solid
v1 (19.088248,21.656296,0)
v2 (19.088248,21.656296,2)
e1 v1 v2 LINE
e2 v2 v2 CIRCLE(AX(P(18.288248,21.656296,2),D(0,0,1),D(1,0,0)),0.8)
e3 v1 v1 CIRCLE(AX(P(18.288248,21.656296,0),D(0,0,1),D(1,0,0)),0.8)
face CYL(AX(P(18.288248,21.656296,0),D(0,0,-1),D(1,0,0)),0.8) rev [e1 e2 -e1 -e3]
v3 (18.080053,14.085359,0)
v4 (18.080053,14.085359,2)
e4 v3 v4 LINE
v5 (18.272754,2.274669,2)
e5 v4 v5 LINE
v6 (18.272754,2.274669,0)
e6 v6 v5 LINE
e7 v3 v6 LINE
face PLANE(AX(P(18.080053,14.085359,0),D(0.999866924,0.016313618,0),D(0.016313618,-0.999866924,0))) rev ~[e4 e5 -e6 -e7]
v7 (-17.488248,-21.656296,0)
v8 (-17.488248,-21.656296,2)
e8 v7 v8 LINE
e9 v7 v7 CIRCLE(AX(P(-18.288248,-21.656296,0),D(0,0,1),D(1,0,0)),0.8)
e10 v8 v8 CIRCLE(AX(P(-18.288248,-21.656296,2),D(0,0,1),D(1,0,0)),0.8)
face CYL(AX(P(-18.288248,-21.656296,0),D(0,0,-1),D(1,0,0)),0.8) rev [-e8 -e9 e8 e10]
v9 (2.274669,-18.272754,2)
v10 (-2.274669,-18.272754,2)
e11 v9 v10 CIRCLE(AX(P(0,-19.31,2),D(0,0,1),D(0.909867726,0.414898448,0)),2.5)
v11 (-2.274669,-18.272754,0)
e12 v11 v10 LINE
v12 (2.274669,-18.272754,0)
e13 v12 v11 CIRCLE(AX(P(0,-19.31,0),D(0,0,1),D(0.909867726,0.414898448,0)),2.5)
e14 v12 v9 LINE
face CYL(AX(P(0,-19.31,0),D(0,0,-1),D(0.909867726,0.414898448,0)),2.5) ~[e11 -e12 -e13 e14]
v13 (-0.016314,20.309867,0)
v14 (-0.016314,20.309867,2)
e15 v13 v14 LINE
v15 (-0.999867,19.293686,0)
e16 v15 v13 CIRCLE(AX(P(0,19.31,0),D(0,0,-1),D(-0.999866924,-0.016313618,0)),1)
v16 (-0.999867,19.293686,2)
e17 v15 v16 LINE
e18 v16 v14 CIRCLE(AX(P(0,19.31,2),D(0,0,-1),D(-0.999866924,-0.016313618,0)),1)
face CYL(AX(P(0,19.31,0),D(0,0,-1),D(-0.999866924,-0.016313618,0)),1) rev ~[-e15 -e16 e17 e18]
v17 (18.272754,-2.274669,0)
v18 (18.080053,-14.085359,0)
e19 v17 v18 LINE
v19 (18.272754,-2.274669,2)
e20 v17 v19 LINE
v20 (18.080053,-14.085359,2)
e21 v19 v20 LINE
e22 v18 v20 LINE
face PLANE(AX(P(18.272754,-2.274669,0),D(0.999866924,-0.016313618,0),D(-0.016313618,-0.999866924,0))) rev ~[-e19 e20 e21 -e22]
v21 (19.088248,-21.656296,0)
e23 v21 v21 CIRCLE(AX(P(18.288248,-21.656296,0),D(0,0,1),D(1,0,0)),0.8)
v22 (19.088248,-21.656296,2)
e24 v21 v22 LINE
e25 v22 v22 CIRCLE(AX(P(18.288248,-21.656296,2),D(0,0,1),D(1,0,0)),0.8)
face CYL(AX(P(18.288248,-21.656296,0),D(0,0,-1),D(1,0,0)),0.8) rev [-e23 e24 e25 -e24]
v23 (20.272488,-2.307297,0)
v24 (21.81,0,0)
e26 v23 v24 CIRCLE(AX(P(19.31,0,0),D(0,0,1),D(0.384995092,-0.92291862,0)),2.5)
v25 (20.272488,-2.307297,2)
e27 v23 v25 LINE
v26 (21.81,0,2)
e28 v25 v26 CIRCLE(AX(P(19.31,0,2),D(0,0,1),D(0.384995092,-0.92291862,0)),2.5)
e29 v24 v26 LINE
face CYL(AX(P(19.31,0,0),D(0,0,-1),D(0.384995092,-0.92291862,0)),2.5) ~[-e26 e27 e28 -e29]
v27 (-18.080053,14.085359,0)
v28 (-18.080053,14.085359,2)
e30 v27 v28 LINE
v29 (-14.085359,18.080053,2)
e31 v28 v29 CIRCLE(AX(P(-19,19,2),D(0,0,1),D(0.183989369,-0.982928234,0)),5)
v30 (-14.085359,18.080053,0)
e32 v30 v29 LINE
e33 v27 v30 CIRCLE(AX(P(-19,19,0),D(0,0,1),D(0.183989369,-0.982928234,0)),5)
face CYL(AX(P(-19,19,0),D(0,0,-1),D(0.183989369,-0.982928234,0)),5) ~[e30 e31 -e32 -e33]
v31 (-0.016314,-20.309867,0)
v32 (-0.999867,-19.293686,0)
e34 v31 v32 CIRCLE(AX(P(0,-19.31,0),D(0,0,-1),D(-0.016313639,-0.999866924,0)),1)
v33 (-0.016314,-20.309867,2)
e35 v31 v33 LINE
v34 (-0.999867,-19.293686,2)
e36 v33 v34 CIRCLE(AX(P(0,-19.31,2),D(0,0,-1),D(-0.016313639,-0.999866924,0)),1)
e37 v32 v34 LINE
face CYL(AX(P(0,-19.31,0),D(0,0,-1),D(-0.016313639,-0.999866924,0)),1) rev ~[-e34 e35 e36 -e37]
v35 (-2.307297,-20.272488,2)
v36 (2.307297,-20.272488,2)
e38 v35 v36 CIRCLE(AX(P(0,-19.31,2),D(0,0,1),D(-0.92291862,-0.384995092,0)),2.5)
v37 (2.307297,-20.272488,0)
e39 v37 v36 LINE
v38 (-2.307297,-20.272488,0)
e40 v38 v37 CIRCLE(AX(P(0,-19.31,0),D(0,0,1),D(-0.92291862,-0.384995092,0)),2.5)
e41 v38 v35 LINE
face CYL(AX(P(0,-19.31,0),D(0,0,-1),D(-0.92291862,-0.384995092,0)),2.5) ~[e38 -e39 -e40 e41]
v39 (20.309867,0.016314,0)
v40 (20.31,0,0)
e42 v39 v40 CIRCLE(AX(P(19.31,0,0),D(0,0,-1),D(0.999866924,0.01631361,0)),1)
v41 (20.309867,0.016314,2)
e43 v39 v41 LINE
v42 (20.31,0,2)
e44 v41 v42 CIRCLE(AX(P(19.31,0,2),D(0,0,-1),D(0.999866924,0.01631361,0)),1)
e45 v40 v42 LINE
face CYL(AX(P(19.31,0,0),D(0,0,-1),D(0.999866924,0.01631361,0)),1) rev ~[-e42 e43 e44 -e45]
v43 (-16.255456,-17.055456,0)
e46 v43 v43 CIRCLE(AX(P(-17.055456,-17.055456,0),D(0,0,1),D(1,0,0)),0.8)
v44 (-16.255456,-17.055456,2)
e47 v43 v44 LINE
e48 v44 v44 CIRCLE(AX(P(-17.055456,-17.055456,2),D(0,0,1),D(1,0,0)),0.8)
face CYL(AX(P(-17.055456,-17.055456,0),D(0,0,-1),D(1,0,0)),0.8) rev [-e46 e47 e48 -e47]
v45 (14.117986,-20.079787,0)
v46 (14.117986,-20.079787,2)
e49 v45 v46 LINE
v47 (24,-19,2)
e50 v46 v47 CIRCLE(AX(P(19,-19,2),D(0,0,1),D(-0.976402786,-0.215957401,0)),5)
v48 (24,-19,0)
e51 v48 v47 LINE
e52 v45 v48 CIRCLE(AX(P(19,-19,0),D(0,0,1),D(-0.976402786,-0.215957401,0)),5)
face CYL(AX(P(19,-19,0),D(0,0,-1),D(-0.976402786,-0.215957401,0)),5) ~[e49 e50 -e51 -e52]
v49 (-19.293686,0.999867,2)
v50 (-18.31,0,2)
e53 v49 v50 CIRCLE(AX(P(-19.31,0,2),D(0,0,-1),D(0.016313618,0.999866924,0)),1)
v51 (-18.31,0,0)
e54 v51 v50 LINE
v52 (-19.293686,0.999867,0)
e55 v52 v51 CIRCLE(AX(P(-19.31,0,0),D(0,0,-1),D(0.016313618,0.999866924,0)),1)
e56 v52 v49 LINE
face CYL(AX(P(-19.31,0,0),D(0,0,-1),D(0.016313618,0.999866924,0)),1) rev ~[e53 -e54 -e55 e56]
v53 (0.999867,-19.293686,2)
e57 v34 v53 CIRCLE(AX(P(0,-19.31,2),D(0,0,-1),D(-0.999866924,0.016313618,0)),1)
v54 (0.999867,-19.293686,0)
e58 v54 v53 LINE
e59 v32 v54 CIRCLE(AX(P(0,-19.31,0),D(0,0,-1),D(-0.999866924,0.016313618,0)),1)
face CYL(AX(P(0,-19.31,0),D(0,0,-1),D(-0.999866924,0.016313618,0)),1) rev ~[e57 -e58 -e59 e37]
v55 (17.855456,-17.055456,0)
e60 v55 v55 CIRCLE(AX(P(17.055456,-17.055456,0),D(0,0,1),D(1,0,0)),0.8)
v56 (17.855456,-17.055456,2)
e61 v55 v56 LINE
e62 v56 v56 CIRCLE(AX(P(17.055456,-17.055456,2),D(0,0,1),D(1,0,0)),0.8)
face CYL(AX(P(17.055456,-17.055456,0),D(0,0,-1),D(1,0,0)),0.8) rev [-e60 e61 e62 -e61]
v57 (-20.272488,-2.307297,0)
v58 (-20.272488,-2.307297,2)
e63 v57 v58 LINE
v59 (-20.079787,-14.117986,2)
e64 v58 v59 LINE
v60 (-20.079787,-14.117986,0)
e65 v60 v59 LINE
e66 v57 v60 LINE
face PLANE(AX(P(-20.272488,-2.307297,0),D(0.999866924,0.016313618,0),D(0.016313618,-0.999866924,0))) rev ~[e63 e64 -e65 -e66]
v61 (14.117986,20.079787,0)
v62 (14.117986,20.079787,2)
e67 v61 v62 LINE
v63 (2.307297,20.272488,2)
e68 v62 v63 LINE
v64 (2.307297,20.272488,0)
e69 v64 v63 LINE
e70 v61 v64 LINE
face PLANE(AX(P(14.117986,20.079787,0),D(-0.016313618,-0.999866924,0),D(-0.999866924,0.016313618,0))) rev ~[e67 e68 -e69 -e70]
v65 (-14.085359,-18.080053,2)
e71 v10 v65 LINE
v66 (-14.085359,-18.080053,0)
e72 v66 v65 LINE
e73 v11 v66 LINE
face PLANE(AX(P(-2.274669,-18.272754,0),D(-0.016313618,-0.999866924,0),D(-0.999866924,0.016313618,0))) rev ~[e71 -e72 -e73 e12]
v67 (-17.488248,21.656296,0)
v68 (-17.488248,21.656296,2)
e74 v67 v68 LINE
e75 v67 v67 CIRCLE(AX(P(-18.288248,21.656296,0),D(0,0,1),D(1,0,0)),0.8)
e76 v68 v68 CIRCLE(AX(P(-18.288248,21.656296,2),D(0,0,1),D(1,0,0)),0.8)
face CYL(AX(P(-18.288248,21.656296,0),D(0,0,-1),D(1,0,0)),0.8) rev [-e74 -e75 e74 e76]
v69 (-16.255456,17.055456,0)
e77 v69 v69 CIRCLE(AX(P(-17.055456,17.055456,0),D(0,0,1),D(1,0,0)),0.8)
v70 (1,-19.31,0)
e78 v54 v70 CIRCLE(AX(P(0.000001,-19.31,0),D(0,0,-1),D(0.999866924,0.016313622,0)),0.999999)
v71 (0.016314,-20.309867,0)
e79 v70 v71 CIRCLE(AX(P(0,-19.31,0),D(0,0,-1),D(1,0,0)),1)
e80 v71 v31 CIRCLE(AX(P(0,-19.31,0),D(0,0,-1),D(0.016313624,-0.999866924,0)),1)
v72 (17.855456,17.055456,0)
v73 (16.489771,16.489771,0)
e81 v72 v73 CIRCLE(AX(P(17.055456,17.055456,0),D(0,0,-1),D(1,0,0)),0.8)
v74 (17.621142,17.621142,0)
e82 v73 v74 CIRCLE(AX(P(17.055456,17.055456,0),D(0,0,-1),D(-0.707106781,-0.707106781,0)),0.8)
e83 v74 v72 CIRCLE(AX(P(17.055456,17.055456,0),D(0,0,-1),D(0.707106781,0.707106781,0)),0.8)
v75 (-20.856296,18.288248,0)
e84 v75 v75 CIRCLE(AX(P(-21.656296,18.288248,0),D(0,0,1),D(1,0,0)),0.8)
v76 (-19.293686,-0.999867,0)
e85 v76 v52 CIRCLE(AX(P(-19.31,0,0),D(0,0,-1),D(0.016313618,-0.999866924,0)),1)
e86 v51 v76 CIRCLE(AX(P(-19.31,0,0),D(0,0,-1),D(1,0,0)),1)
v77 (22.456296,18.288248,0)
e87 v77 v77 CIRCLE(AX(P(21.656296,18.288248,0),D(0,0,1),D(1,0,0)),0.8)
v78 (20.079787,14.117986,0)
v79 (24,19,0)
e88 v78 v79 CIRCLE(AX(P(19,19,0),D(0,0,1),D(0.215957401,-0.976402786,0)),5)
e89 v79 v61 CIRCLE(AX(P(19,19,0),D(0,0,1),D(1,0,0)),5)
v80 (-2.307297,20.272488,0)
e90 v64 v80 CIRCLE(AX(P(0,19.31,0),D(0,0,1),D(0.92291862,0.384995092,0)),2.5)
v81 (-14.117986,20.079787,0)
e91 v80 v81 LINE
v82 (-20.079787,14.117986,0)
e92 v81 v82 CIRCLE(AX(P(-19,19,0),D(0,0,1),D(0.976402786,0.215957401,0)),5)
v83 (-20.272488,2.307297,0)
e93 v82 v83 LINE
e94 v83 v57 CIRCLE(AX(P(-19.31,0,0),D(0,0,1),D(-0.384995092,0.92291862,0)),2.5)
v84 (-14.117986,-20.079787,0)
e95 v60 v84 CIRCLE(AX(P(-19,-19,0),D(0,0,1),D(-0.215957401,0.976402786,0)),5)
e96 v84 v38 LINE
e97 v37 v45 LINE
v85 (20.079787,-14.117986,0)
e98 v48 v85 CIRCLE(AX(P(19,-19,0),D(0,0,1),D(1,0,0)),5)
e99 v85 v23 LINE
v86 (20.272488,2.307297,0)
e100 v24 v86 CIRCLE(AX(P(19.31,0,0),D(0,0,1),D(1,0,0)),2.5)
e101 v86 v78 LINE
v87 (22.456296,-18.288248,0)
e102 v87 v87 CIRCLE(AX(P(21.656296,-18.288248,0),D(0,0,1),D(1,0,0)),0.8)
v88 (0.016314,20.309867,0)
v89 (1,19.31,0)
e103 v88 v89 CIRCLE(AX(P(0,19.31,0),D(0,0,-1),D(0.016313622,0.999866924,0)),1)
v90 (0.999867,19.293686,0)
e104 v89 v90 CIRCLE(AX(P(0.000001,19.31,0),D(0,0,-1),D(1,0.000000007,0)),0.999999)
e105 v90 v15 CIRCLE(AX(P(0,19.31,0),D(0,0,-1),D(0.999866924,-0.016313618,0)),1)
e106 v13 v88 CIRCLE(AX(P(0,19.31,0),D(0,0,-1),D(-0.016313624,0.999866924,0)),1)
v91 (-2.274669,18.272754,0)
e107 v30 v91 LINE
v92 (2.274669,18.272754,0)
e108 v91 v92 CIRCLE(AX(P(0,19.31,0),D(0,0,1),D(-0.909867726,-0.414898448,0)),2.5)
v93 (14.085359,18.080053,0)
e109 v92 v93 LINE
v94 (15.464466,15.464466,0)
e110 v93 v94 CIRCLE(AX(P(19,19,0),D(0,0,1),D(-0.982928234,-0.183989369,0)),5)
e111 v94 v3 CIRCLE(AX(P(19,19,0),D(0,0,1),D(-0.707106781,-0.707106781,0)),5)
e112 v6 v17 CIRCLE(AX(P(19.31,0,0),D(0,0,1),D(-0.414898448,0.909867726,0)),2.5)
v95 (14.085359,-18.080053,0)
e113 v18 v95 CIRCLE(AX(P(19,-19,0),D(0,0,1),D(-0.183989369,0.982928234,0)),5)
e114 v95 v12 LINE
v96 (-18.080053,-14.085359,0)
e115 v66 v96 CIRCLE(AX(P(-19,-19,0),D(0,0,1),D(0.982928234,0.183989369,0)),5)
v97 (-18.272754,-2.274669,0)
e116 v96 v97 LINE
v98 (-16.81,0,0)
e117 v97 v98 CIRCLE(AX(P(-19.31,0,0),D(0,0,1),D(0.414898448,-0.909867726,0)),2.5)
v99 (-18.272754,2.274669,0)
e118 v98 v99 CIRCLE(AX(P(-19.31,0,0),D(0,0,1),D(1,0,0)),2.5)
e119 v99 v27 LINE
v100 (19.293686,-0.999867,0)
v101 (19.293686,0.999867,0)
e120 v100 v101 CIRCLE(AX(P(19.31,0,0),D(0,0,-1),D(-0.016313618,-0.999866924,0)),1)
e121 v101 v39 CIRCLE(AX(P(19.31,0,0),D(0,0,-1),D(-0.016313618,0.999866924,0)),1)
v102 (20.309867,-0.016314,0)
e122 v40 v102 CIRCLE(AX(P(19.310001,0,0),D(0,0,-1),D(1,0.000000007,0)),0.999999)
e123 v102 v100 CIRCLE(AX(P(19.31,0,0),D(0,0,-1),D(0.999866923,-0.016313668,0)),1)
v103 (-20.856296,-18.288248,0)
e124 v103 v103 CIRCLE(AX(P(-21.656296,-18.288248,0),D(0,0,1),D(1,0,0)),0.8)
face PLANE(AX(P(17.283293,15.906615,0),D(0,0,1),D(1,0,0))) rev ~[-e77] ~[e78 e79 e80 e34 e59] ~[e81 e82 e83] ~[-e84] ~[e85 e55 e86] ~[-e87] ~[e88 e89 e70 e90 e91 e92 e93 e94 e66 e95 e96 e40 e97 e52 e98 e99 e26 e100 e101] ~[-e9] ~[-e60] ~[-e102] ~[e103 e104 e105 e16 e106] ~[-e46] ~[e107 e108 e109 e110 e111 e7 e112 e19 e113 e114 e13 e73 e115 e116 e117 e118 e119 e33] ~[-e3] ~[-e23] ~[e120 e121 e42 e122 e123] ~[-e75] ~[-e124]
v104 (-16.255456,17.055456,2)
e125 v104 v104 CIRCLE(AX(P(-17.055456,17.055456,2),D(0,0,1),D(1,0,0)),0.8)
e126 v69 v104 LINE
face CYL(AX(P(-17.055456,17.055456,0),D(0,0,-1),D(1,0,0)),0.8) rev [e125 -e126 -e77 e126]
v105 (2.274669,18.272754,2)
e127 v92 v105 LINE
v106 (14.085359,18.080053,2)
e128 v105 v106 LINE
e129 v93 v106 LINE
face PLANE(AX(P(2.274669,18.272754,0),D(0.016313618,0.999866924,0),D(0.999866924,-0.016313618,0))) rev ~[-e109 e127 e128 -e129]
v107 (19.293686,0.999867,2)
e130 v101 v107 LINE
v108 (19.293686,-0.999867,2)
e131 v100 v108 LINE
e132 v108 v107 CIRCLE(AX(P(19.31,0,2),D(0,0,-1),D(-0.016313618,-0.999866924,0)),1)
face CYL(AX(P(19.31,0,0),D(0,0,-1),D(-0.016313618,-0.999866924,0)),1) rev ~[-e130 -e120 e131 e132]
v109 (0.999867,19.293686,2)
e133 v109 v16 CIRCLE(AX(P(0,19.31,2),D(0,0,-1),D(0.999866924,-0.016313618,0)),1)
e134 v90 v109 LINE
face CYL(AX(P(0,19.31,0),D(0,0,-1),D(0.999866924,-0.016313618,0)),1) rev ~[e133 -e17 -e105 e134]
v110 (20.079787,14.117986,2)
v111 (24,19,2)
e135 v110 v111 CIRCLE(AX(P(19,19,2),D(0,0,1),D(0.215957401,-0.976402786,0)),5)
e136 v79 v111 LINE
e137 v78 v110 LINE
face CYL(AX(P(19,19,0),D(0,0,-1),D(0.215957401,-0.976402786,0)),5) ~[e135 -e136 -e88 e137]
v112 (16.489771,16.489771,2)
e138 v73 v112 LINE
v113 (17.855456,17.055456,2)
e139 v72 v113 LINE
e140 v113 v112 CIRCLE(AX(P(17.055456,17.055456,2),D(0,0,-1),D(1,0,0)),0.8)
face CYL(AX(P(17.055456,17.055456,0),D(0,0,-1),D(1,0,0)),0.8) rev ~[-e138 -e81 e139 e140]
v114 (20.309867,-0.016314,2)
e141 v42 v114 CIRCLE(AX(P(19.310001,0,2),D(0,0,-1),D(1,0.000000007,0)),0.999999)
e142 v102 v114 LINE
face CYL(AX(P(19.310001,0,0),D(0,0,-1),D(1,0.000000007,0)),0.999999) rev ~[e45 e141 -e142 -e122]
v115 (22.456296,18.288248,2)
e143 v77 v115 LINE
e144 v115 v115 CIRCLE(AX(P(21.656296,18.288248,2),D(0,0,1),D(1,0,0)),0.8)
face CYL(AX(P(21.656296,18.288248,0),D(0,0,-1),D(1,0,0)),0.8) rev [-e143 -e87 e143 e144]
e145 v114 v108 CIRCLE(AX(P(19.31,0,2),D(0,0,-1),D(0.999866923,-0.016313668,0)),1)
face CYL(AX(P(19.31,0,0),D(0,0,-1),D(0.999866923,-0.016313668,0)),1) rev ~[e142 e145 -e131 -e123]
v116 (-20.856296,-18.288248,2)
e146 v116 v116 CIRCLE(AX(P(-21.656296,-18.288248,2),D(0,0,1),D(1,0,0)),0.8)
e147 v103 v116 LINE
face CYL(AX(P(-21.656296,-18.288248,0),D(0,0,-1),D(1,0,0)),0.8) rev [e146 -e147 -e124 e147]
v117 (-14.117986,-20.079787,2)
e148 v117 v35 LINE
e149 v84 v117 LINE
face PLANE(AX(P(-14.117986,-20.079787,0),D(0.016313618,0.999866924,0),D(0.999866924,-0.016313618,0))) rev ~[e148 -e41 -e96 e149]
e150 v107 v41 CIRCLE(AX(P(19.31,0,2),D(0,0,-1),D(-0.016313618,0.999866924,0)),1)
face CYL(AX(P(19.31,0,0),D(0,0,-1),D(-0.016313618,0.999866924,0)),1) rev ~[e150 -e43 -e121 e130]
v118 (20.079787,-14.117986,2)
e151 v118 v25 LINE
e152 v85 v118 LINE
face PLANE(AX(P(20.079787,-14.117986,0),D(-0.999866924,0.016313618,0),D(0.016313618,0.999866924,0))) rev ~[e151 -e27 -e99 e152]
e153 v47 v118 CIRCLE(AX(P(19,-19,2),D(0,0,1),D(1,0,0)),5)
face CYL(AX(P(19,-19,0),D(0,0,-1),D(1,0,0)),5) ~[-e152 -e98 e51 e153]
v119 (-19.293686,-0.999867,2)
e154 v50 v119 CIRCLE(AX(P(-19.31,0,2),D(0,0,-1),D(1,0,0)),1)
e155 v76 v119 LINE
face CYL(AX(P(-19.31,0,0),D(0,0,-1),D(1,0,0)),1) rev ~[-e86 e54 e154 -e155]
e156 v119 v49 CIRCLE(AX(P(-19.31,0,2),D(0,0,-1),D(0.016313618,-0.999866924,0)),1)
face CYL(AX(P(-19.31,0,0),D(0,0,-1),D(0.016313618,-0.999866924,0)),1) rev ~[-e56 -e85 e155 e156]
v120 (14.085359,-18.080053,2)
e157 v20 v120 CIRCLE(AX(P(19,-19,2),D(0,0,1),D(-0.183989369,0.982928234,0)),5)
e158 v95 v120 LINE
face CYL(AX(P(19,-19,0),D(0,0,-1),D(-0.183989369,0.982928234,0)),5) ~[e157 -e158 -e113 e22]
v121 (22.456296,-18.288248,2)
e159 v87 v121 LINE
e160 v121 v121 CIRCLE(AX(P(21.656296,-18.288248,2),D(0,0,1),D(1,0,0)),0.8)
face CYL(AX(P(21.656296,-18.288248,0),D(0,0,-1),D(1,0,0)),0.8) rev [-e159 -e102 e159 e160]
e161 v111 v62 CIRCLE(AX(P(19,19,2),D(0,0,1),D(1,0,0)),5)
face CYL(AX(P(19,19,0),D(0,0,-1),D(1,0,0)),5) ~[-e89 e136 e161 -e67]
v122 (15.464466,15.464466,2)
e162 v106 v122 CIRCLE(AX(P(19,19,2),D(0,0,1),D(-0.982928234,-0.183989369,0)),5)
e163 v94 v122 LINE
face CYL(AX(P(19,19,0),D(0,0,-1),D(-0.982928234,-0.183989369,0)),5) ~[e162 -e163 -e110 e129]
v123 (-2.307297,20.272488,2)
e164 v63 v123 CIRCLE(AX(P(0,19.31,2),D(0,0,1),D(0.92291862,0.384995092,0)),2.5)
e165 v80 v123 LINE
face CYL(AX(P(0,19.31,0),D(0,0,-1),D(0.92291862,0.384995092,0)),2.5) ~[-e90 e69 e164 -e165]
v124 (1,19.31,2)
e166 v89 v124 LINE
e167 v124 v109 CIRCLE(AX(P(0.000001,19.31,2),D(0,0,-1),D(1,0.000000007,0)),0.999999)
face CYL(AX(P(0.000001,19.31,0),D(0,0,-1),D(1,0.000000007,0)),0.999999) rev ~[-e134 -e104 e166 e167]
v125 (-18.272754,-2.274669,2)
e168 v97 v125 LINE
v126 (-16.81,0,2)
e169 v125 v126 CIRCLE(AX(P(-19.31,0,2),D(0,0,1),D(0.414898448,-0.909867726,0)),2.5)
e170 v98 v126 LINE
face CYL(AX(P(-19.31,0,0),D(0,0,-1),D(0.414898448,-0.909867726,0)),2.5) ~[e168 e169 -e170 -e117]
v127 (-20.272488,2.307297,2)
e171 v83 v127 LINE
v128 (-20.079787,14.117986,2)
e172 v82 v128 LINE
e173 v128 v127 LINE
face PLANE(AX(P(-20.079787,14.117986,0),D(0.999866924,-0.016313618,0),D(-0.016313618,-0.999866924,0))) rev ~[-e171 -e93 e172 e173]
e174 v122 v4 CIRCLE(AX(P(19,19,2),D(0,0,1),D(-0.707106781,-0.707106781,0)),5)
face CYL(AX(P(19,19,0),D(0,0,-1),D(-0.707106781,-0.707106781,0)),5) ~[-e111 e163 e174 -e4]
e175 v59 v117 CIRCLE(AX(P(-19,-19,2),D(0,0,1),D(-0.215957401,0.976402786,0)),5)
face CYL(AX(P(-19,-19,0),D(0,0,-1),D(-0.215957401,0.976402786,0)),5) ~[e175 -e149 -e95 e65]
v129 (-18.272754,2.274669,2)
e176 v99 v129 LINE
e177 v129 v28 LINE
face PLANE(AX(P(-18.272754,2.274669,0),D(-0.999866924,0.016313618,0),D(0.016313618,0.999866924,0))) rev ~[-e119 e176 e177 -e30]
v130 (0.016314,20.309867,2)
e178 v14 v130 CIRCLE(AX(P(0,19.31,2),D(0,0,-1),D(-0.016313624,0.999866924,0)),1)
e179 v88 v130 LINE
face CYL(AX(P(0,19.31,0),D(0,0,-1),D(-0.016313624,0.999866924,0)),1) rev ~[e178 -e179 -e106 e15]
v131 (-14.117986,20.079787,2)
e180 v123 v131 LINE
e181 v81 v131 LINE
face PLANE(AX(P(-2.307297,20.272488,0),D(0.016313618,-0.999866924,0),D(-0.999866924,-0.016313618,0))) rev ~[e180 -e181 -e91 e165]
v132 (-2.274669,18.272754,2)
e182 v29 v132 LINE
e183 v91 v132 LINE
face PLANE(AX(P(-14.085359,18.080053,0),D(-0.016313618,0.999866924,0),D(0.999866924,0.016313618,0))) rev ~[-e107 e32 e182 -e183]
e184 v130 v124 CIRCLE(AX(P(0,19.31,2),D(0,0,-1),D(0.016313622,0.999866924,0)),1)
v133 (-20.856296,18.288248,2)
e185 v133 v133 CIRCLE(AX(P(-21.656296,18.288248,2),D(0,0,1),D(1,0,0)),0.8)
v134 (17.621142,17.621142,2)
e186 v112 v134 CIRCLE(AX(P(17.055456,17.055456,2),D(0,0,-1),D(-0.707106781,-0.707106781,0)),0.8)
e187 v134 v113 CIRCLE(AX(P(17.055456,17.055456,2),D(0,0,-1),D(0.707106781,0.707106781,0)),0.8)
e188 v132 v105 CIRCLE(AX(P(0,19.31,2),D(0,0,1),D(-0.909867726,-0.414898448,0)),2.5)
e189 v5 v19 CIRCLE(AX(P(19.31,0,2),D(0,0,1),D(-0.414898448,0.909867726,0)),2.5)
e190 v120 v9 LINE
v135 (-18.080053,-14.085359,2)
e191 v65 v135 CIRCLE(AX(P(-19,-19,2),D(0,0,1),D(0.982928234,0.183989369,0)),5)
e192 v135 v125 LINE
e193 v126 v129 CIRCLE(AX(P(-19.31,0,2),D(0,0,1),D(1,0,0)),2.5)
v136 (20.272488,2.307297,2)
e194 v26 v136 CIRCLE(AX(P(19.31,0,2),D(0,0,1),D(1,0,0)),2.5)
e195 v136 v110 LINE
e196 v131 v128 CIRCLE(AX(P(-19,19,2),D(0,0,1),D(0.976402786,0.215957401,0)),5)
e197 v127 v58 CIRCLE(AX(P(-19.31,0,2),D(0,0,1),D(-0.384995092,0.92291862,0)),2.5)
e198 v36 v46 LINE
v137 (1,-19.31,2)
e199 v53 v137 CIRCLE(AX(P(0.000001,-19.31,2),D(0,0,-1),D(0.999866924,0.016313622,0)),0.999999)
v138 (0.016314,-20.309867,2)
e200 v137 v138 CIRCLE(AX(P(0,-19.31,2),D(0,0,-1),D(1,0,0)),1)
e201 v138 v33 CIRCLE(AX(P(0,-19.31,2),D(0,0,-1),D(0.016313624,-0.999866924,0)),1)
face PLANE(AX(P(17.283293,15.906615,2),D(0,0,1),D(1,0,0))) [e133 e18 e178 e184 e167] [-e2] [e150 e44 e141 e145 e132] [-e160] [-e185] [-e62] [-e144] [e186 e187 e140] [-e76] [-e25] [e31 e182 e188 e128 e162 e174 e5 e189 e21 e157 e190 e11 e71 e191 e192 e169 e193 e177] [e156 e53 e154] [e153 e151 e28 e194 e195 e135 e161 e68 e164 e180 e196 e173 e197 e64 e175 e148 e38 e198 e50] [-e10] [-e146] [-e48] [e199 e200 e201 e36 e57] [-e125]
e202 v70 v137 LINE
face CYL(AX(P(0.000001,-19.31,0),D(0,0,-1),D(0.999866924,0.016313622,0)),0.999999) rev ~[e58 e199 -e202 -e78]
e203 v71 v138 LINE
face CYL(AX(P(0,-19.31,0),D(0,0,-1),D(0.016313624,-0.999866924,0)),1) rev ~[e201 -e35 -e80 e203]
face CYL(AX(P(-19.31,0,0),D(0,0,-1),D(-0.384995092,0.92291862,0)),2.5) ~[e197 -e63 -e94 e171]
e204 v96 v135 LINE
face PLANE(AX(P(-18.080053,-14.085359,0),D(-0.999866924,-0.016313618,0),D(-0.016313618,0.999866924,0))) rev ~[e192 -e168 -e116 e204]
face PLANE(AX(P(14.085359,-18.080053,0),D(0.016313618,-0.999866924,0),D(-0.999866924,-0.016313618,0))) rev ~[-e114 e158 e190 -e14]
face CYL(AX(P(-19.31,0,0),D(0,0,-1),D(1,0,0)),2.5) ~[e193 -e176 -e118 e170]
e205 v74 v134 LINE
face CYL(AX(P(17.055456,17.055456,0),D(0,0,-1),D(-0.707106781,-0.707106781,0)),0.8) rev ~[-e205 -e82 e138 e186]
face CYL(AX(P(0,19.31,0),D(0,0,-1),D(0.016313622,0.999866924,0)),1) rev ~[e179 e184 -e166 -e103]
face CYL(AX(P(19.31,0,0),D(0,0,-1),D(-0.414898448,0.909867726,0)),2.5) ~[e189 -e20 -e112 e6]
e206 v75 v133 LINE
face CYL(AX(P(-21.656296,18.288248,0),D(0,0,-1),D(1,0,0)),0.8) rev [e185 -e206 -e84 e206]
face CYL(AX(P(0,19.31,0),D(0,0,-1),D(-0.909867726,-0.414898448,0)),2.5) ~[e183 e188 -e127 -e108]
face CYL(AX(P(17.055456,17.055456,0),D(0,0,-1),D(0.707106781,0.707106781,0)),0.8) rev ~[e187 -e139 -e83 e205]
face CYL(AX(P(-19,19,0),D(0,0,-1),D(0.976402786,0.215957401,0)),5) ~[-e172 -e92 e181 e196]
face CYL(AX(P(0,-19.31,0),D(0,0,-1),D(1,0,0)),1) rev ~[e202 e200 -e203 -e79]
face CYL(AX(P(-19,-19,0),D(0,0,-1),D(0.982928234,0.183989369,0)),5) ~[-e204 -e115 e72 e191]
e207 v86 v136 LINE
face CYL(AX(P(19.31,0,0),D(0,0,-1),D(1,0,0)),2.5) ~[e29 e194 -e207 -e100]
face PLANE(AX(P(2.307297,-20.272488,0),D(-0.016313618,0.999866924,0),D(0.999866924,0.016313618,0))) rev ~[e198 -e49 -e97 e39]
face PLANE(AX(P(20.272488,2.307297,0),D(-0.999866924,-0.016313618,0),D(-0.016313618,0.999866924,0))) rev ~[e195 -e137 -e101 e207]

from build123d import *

# Parameters (mm, degrees)
F0_R     = 0.8
F1_DEPTH = 2


with BuildPart() as f1:
    # F0 (on Top) → F1 (new body)
    with BuildSketch(Plane.XY):
        with BuildLine():
            ThreePointArc((17.6211417767, 17.6211417767), (17.7945599777, 17.3616030976), (17.8554563517, 17.0554563517))
            ThreePointArc((17.8554563517, 17.0554563517), (17.3616030976, 16.3163527257), (16.4897709268, 16.4897709268))
            Line((16.4897709268, 16.4897709268), (15.4644660941, 15.4644660941))
            ThreePointArc((15.4644660941, 15.4644660941), (16.6679812638, 14.5771402222), (18.080053157, 14.0853588324))
            Line((18.080053157, 14.0853588324), (18.0159229011, 18.0159229011))
            Line((18.0159229011, 18.0159229011), (17.6211417767, 17.6211417767))
        make_face()
        with BuildLine():
            ThreePointArc((16.4897709268, 16.4897709268), (16.4897709268, 17.6211417767), (17.6211417767, 17.6211417767))
            Line((17.6211417767, 17.6211417767), (18.0159229011, 18.0159229011))
            Line((18.0159229011, 18.0159229011), (14.0853588324, 18.080053157))
            ThreePointArc((14.0853588324, 18.080053157), (14.5771402222, 16.6679812638), (15.4644660941, 15.4644660941))
            Line((15.4644660941, 15.4644660941), (16.4897709268, 16.4897709268))
        make_face()
        with BuildLine():
            Line((14.0853588324, 18.080053157), (18.0159229011, 18.0159229011))
            Line((18.0159229011, 18.0159229011), (19, 19))
            Line((19, 19), (14.0006653796, 19.0815680912))
            ThreePointArc((14.0006653796, 19.0815680912), (14.017782921, 18.5786771094), (14.0853588324, 18.080053157))
        make_face()
        with BuildLine():
            Line((19, 19), (18.0159229011, 18.0159229011))
            Line((18.0159229011, 18.0159229011), (18.080053157, 14.0853588324))
            ThreePointArc((18.080053157, 14.0853588324), (18.5786771094, 14.017782921), (19.0815680912, 14.0006653796))
            Line((19.0815680912, 14.0006653796), (19, 19))
        make_face()
        with BuildLine():
            Line((14.0006653796, 19.0815680912), (19, 19))
            Line((19, 19), (19.0815680912, 14.0006653796))
            ThreePointArc((19.0815680912, 14.0006653796), (19.5836329763, 14.0341795694), (20.0797870051, 14.1179860689))
            Line((20.0797870051, 14.1179860689), (19.9840770989, 19.9840770989))
            Line((19.9840770989, 19.9840770989), (14.1179860689, 20.0797870051))
            ThreePointArc((14.1179860689, 20.0797870051), (14.0341795694, 19.5836329763), (14.0006653796, 19.0815680912))
        make_face()
        with BuildLine():
            Line((2.274669314, 18.2727538807), (14.0853588324, 18.080053157))
            ThreePointArc((14.0853588324, 18.080053157), (14.017782921, 18.5786771094), (14.0006653796, 19.0815680912))
            Line((14.0006653796, 19.0815680912), (2.4996673102, 19.2692159544))
            ThreePointArc((2.4996673102, 19.2692159544), (2.4386075363, 18.7593701028), (2.274669314, 18.2727538807))
        make_face()
        with BuildLine():
            ThreePointArc((19.0815680912, 14.0006653796), (18.5786771094, 14.017782921), (18.080053157, 14.0853588324))
            Line((18.080053157, 14.0853588324), (18.2727538807, 2.274669314))
            ThreePointArc((18.2727538807, 2.274669314), (18.7593701028, 2.4386075363), (19.2692159544, 2.4996673102))
            Line((19.2692159544, 2.4996673102), (19.0815680912, 14.0006653796))
        make_face()
        with BuildLine():
            ThreePointArc((20.0797870051, 14.1179860689), (19.5836329763, 14.0341795694), (19.0815680912, 14.0006653796))
            Line((19.0815680912, 14.0006653796), (19.2692159544, 2.4996673102))
            ThreePointArc((19.2692159544, 2.4996673102), (19.7807823778, 2.455272684), (20.2724877289, 2.3072965505))
            Line((20.2724877289, 2.3072965505), (20.0797870051, 14.1179860689))
        make_face()
        with BuildLine():
            Line((2.4996673102, 19.2692159544), (14.0006653796, 19.0815680912))
            ThreePointArc((14.0006653796, 19.0815680912), (14.0341795694, 19.5836329763), (14.1179860689, 20.0797870051))
            Line((14.1179860689, 20.0797870051), (2.3072965505, 20.2724877289))
            ThreePointArc((2.3072965505, 20.2724877289), (2.4513507885, 19.800794572), (2.5, 19.31))
            ThreePointArc((2.5, 19.31), (2.4999168262, 19.2896072988), (2.4996673102, 19.2692159544))
        make_face()
        with BuildLine():
            Line((0, 18.3098669064), (2.274669314, 18.2727538807))
            ThreePointArc((2.274669314, 18.2727538807), (2.4386075363, 18.7593701028), (2.4996673102, 19.2692159544))
            Line((2.4996673102, 19.2692159544), (0.9998669241, 19.2936863818))
            ThreePointArc((0.9998669241, 19.2936863818), (0, 18.31), (-0.9998669241, 19.2936863818))
            Line((-0.9998669241, 19.2936863818), (-2.4996673102, 19.2692159544))
            ThreePointArc((-2.4996673102, 19.2692159544), (-2.4386075363, 18.7593701028), (-2.274669314, 18.2727538807))
            Line((-2.274669314, 18.2727538807), (0, 18.3098669064))
        make_face()
        with BuildLine():
            ThreePointArc((-2.274669314, 18.2727538807), (0, 16.81), (2.274669314, 18.2727538807))
            Line((2.274669314, 18.2727538807), (0, 18.3098669064))
            Line((0, 18.3098669064), (-2.274669314, 18.2727538807))
        make_face()
        with BuildLine():
            Line((18.3098669064, 0), (18.2727538807, 2.274669314))
            ThreePointArc((18.2727538807, 2.274669314), (16.81, 0), (18.2727538807, -2.274669314))
            Line((18.2727538807, -2.274669314), (18.3098669064, 0))
        make_face()
        with BuildLine():
            ThreePointArc((19.2692159544, 2.4996673102), (18.7593701028, 2.4386075363), (18.2727538807, 2.274669314))
            Line((18.2727538807, 2.274669314), (18.3098669064, 0))
            Line((18.3098669064, 0), (18.2727538807, -2.274669314))
            ThreePointArc((18.2727538807, -2.274669314), (18.7593701028, -2.4386075363), (19.2692159544, -2.4996673102))
            Line((19.2692159544, -2.4996673102), (19.2936863818, -0.9998669241))
            ThreePointArc((19.2936863818, -0.9998669241), (18.31, 0), (19.2936863818, 0.9998669241))
            Line((19.2936863818, 0.9998669241), (19.2692159544, 2.4996673102))
        make_face()
        with BuildLine():
            Line((19.9840770989, 19.9840770989), (20.0797870051, 14.1179860689))
            ThreePointArc((20.0797870051, 14.1179860689), (22.8986494473, 15.8694197843), (24, 19))
            ThreePointArc((24, 19), (19.5431069621, 23.9704159612), (14.1179860689, 20.0797870051))
            Line((14.1179860689, 20.0797870051), (19.9840770989, 19.9840770989))
        make_face()
        with Locations((21.6562960223, 18.288247626)):
            Circle(F0_R, mode=Mode.SUBTRACT)
        with Locations((18.288247626, 21.6562960223)):
            Circle(F0_R, mode=Mode.SUBTRACT)
        with BuildLine():
            ThreePointArc((20.2724877289, 2.3072965505), (19.7807823778, 2.455272684), (19.2692159544, 2.4996673102))
            Line((19.2692159544, 2.4996673102), (19.2936863818, 0.9998669241))
            ThreePointArc((19.2936863818, 0.9998669241), (20.0054772146, 0.7185481501), (20.3098669242, 0.0163136116))
            Line((20.3098669242, 0.0163136116), (20.2724877289, 2.3072965505))
        make_face()
        with BuildLine():
            Line((0.9998669241, 19.2936863818), (2.4996673102, 19.2692159544))
            ThreePointArc((2.4996673102, 19.2692159544), (2.4999168262, 19.2896072988), (2.5, 19.31))
            ThreePointArc((2.5, 19.31), (2.4513507885, 19.800794572), (2.3072965505, 20.2724877289))
            Line((2.3072965505, 20.2724877289), (0.0163136221, 20.309866924))
            ThreePointArc((0.0163136221, 20.309866924), (0.7128511844, 20.0113153278), (1, 19.31))
            ThreePointArc((1, 19.31), (0.9999667305, 19.3018429195), (0.9998669241, 19.2936863818))
        make_face()
        with BuildLine():
            Line((-14.0853588324, 18.080053157), (-2.274669314, 18.2727538807))
            ThreePointArc((-2.274669314, 18.2727538807), (-2.4386075363, 18.7593701028), (-2.4996673102, 19.2692159544))
            Line((-2.4996673102, 19.2692159544), (-14.0006653796, 19.0815680912))
            ThreePointArc((-14.0006653796, 19.0815680912), (-14.0001663477, 19.0407854025), (-14, 19))
            ThreePointArc((-14, 19), (-14.0213854418, 18.5380507809), (-14.0853588324, 18.080053157))
        make_face()
        with BuildLine():
            ThreePointArc((19.2692159544, -2.4996673102), (18.7593701028, -2.4386075363), (18.2727538807, -2.274669314))
            Line((18.2727538807, -2.274669314), (18.080053157, -14.0853588324))
            ThreePointArc((18.080053157, -14.0853588324), (18.5786771094, -14.017782921), (19.0815680912, -14.0006653796))
            Line((19.0815680912, -14.0006653796), (19.2692159544, -2.4996673102))
        make_face()
        with BuildLine():
            ThreePointArc((21.81, 0), (21.3904109356, 1.3863225955), (20.2724877289, 2.3072965505))
            Line((20.2724877289, 2.3072965505), (20.3098669242, 0.0163136116))
            Line((20.3098669242, 0.0163136116), (20.3101330936, 0))
            Line((20.3101330936, 0), (20.3098669233, -0.0163136677))
            Line((20.3098669233, -0.0163136677), (20.2724877289, -2.3072965505))
            ThreePointArc((20.2724877289, -2.3072965505), (21.3904109356, -1.3863225955), (21.81, 0))
        make_face()
        with BuildLine():
            Line((0.0163136221, 20.309866924), (2.3072965505, 20.2724877289))
            ThreePointArc((2.3072965505, 20.2724877289), (0, 21.81), (-2.3072965505, 20.2724877289))
            Line((-2.3072965505, 20.2724877289), (-0.0163136221, 20.309866924))
            Line((-0.0163136221, 20.309866924), (0, 20.3101330936))
            Line((0, 20.3101330936), (0.0163136221, 20.309866924))
        make_face()
        with BuildLine():
            Line((-14.0006653796, 19.0815680912), (-2.4996673102, 19.2692159544))
            ThreePointArc((-2.4996673102, 19.2692159544), (-2.455272684, 19.7807823778), (-2.3072965505, 20.2724877289))
            Line((-2.3072965505, 20.2724877289), (-14.1179860689, 20.0797870051))
            ThreePointArc((-14.1179860689, 20.0797870051), (-14.0341795694, 19.5836329763), (-14.0006653796, 19.0815680912))
        make_face()
        with BuildLine():
            ThreePointArc((-2.3072965505, 20.2724877289), (-2.455272684, 19.7807823778), (-2.4996673102, 19.2692159544))
            Line((-2.4996673102, 19.2692159544), (-0.9998669241, 19.2936863818))
            ThreePointArc((-0.9998669241, 19.2936863818), (-0.7185481537, 20.0054772108), (-0.0163136221, 20.309866924))
            Line((-0.0163136221, 20.309866924), (-2.3072965505, 20.2724877289))
        make_face()
        with BuildLine():
            Line((-18.0159229011, 18.0159229011), (-14.0853588324, 18.080053157))
            ThreePointArc((-14.0853588324, 18.080053157), (-14.0213854418, 18.5380507809), (-14, 19))
            ThreePointArc((-14, 19), (-14.0001663477, 19.0407854025), (-14.0006653796, 19.0815680912))
            Line((-14.0006653796, 19.0815680912), (-19, 19))
            Line((-19, 19), (-19.0815680912, 14.0006653796))
            ThreePointArc((-19.0815680912, 14.0006653796), (-18.5786771094, 14.017782921), (-18.080053157, 14.0853588324))
            Line((-18.080053157, 14.0853588324), (-18.0159229011, 18.0159229011))
        make_face()
        with BuildLine():
            ThreePointArc((-18.080053157, 14.0853588324), (-15.4644660941, 15.4644660941), (-14.0853588324, 18.080053157))
            Line((-14.0853588324, 18.080053157), (-18.0159229011, 18.0159229011))
            Line((-18.0159229011, 18.0159229011), (-18.080053157, 14.0853588324))
        make_face()
        with Locations((-17.0554563517, 17.0554563517)):
            Circle(F0_R, mode=Mode.SUBTRACT)
        with BuildLine():
            Line((19.2936863818, -0.9998669241), (19.2692159544, -2.4996673102))
            ThreePointArc((19.2692159544, -2.4996673102), (19.7807823778, -2.455272684), (20.2724877289, -2.3072965505))
            Line((20.2724877289, -2.3072965505), (20.3098669233, -0.0163136677))
            ThreePointArc((20.3098669233, -0.0163136677), (20.0054771945, -0.7185481696), (19.2936863818, -0.9998669241))
        make_face()
        with BuildLine():
            ThreePointArc((20.2724877289, -2.3072965505), (19.7807823778, -2.455272684), (19.2692159544, -2.4996673102))
            Line((19.2692159544, -2.4996673102), (19.0815680912, -14.0006653796))
            ThreePointArc((19.0815680912, -14.0006653796), (19.5836329763, -14.0341795694), (20.0797870051, -14.1179860689))
            Line((20.0797870051, -14.1179860689), (20.2724877289, -2.3072965505))
        make_face()
        with BuildLine():
            Line((18.0159229011, -18.0159229011), (18.080053157, -14.0853588324))
            ThreePointArc((18.080053157, -14.0853588324), (15.4644660941, -15.4644660941), (14.0853588324, -18.080053157))
            Line((14.0853588324, -18.080053157), (18.0159229011, -18.0159229011))
        make_face()
        with Locations((17.0554563517, -17.0554563517)):
            Circle(F0_R, mode=Mode.SUBTRACT)
        with BuildLine():
            ThreePointArc((19.0815680912, -14.0006653796), (18.5786771094, -14.017782921), (18.080053157, -14.0853588324))
            Line((18.080053157, -14.0853588324), (18.0159229011, -18.0159229011))
            Line((18.0159229011, -18.0159229011), (14.0853588324, -18.080053157))
            ThreePointArc((14.0853588324, -18.080053157), (14.017782921, -18.5786771094), (14.0006653796, -19.0815680912))
            Line((14.0006653796, -19.0815680912), (19, -19))
            Line((19, -19), (19.0815680912, -14.0006653796))
        make_face()
        with BuildLine():
            Line((20.3101330936, 0), (20.3098669242, 0.0163136116))
            ThreePointArc((20.3098669242, 0.0163136116), (20.3099667305, 0.0081570772), (20.31, 0))
            ThreePointArc((20.31, 0), (20.3099667303, -0.0081571052), (20.3098669233, -0.0163136677))
            Line((20.3098669233, -0.0163136677), (20.3101330936, 0))
        make_face()
        with BuildLine():
            ThreePointArc((-0.0163136221, 20.309866924), (0, 20.31), (0.0163136221, 20.309866924))
            Line((0.0163136221, 20.309866924), (0, 20.3101330936))
            Line((0, 20.3101330936), (-0.0163136221, 20.309866924))
        make_face()
        with BuildLine():
            Line((-19, 19), (-14.0006653796, 19.0815680912))
            ThreePointArc((-14.0006653796, 19.0815680912), (-14.0341795694, 19.5836329763), (-14.1179860689, 20.0797870051))
            ThreePointArc((-14.1179860689, 20.0797870051), (-22.5355339059, 22.5355339059), (-20.0797870051, 14.1179860689))
            ThreePointArc((-20.0797870051, 14.1179860689), (-19.5836329763, 14.0341795694), (-19.0815680912, 14.0006653796))
            Line((-19.0815680912, 14.0006653796), (-19, 19))
        make_face()
        with Locations((-21.6562960223, 18.288247626)):
            Circle(F0_R, mode=Mode.SUBTRACT)
        with Locations((-18.288247626, 21.6562960223)):
            Circle(F0_R, mode=Mode.SUBTRACT)
        with BuildLine():
            Line((-18.2727538807, 2.274669314), (-18.080053157, 14.0853588324))
            ThreePointArc((-18.080053157, 14.0853588324), (-18.5786771094, 14.017782921), (-19.0815680912, 14.0006653796))
            Line((-19.0815680912, 14.0006653796), (-19.2692159544, 2.4996673102))
            ThreePointArc((-19.2692159544, 2.4996673102), (-18.7593701028, 2.4386075363), (-18.2727538807, 2.274669314))
        make_face()
        with BuildLine():
            ThreePointArc((20.0797870051, -14.1179860689), (19.5836329763, -14.0341795694), (19.0815680912, -14.0006653796))
            Line((19.0815680912, -14.0006653796), (19, -19))
            Line((19, -19), (14.0006653796, -19.0815680912))
            ThreePointArc((14.0006653796, -19.0815680912), (14.0341795694, -19.5836329763), (14.1179860689, -20.0797870051))
            Line((14.1179860689, -20.0797870051), (19.9840770989, -19.9840770989))
            Line((19.9840770989, -19.9840770989), (20.0797870051, -14.1179860689))
        make_face()
        with BuildLine():
            ThreePointArc((14.0006653796, -19.0815680912), (14.017782921, -18.5786771094), (14.0853588324, -18.080053157))
            Line((14.0853588324, -18.080053157), (2.274669314, -18.2727538807))
            ThreePointArc((2.274669314, -18.2727538807), (2.4386075363, -18.7593701028), (2.4996673102, -19.2692159544))
            Line((2.4996673102, -19.2692159544), (14.0006653796, -19.0815680912))
        make_face()
        with BuildLine():
            Line((-19.2692159544, 2.4996673102), (-19.0815680912, 14.0006653796))
            ThreePointArc((-19.0815680912, 14.0006653796), (-19.5836329763, 14.0341795694), (-20.0797870051, 14.1179860689))
            Line((-20.0797870051, 14.1179860689), (-20.2724877289, 2.3072965505))
            ThreePointArc((-20.2724877289, 2.3072965505), (-19.7807823778, 2.455272684), (-19.2692159544, 2.4996673102))
        make_face()
        with BuildLine():
            ThreePointArc((-16.81, 0), (-17.2072499794, 1.3521990796), (-18.2727538807, 2.274669314))
            ThreePointArc((-18.2727538807, 2.274669314), (-18.7593701028, 2.4386075363), (-19.2692159544, 2.4996673102))
            Line((-19.2692159544, 2.4996673102), (-19.2936863818, 0.9998669241))
            ThreePointArc((-19.2936863818, 0.9998669241), (-18.597148817, 0.7013153291), (-18.31, 0))
            ThreePointArc((-18.31, 0), (-18.597148817, -0.7013153291), (-19.2936863818, -0.9998669241))
            Line((-19.2936863818, -0.9998669241), (-19.2692159544, -2.4996673102))
            ThreePointArc((-19.2692159544, -2.4996673102), (-18.7593701028, -2.4386075363), (-18.2727538807, -2.274669314))
            ThreePointArc((-18.2727538807, -2.274669314), (-17.2072499794, -1.3521990796), (-16.81, 0))
        make_face()
        with BuildLine():
            ThreePointArc((24, -19), (22.8986494473, -15.8694197843), (20.0797870051, -14.1179860689))
            Line((20.0797870051, -14.1179860689), (19.9840770989, -19.9840770989))
            Line((19.9840770989, -19.9840770989), (14.1179860689, -20.0797870051))
            ThreePointArc((14.1179860689, -20.0797870051), (19.5431069621, -23.9704159612), (24, -19))
        make_face()
        with Locations((18.288247626, -21.6562960223)):
            Circle(F0_R, mode=Mode.SUBTRACT)
        with Locations((21.6562960223, -18.288247626)):
            Circle(F0_R, mode=Mode.SUBTRACT)
        with BuildLine():
            ThreePointArc((14.1179860689, -20.0797870051), (14.0341795694, -19.5836329763), (14.0006653796, -19.0815680912))
            Line((14.0006653796, -19.0815680912), (2.4996673102, -19.2692159544))
            ThreePointArc((2.4996673102, -19.2692159544), (2.4999168262, -19.2896072988), (2.5, -19.31))
            ThreePointArc((2.5, -19.31), (2.4513507885, -19.800794572), (2.3072965505, -20.2724877289))
            Line((2.3072965505, -20.2724877289), (14.1179860689, -20.0797870051))
        make_face()
        with BuildLine():
            Line((0, -18.3098669064), (2.274669314, -18.2727538807))
            ThreePointArc((2.274669314, -18.2727538807), (0, -16.81), (-2.274669314, -18.2727538807))
            Line((-2.274669314, -18.2727538807), (0, -18.3098669064))
        make_face()
        with BuildLine():
            ThreePointArc((2.4996673102, -19.2692159544), (2.4386075363, -18.7593701028), (2.274669314, -18.2727538807))
            Line((2.274669314, -18.2727538807), (0, -18.3098669064))
            Line((0, -18.3098669064), (-2.274669314, -18.2727538807))
            ThreePointArc((-2.274669314, -18.2727538807), (-2.4386075363, -18.7593701028), (-2.4996673102, -19.2692159544))
            Line((-2.4996673102, -19.2692159544), (-0.9998669241, -19.2936863818))
            ThreePointArc((-0.9998669241, -19.2936863818), (0, -18.31), (0.9998669241, -19.2936863818))
            Line((0.9998669241, -19.2936863818), (2.4996673102, -19.2692159544))
        make_face()
        with BuildLine():
            Line((-19.2936863818, 0.9998669241), (-19.2692159544, 2.4996673102))
            ThreePointArc((-19.2692159544, 2.4996673102), (-19.7807823778, 2.455272684), (-20.2724877289, 2.3072965505))
            ThreePointArc((-20.2724877289, 2.3072965505), (-21.81, 0), (-20.2724877289, -2.3072965505))
            ThreePointArc((-20.2724877289, -2.3072965505), (-19.7807823778, -2.455272684), (-19.2692159544, -2.4996673102))
            Line((-19.2692159544, -2.4996673102), (-19.2936863818, -0.9998669241))
            ThreePointArc((-19.2936863818, -0.9998669241), (-20.31, 0), (-19.2936863818, 0.9998669241))
        make_face()
        with BuildLine():
            ThreePointArc((2.5, -19.31), (2.4999168262, -19.2896072988), (2.4996673102, -19.2692159544))
            Line((2.4996673102, -19.2692159544), (0.9998669241, -19.2936863818))
            ThreePointArc((0.9998669241, -19.2936863818), (0.9999667305, -19.3018429195), (1, -19.31))
            ThreePointArc((1, -19.31), (0.7128511844, -20.0113153278), (0.0163136221, -20.309866924))
            Line((0.0163136221, -20.309866924), (2.3072965505, -20.2724877289))
            ThreePointArc((2.3072965505, -20.2724877289), (2.4513507885, -19.800794572), (2.5, -19.31))
        make_face()
        with BuildLine():
            ThreePointArc((-2.4996673102, -19.2692159544), (-2.4386075363, -18.7593701028), (-2.274669314, -18.2727538807))
            Line((-2.274669314, -18.2727538807), (-14.0853588324, -18.080053157))
            ThreePointArc((-14.0853588324, -18.080053157), (-14.0213854418, -18.5380507809), (-14, -19))
            ThreePointArc((-14, -19), (-14.0001663477, -19.0407854025), (-14.0006653796, -19.0815680912))
            Line((-14.0006653796, -19.0815680912), (-2.4996673102, -19.2692159544))
        make_face()
        with BuildLine():
            Line((-18.080053157, -14.0853588324), (-18.2727538807, -2.274669314))
            ThreePointArc((-18.2727538807, -2.274669314), (-18.7593701028, -2.4386075363), (-19.2692159544, -2.4996673102))
            Line((-19.2692159544, -2.4996673102), (-19.0815680912, -14.0006653796))
            ThreePointArc((-19.0815680912, -14.0006653796), (-18.5786771094, -14.017782921), (-18.080053157, -14.0853588324))
        make_face()
        with BuildLine():
            ThreePointArc((-2.3072965505, -20.2724877289), (0, -21.81), (2.3072965505, -20.2724877289))
            Line((2.3072965505, -20.2724877289), (0.0163136221, -20.309866924))
            Line((0.0163136221, -20.309866924), (0, -20.3101330936))
            Line((0, -20.3101330936), (-0.0163136391, -20.3098669237))
            Line((-0.0163136391, -20.3098669237), (-2.3072965505, -20.2724877289))
        make_face()
        with BuildLine():
            Line((-0.9998669241, -19.2936863818), (-2.4996673102, -19.2692159544))
            ThreePointArc((-2.4996673102, -19.2692159544), (-2.455272684, -19.7807823778), (-2.3072965505, -20.2724877289))
            Line((-2.3072965505, -20.2724877289), (-0.0163136391, -20.3098669237))
            ThreePointArc((-0.0163136391, -20.3098669237), (-0.7185481596, -20.0054772047), (-0.9998669241, -19.2936863818))
        make_face()
        with BuildLine():
            ThreePointArc((-2.3072965505, -20.2724877289), (-2.455272684, -19.7807823778), (-2.4996673102, -19.2692159544))
            Line((-2.4996673102, -19.2692159544), (-14.0006653796, -19.0815680912))
            ThreePointArc((-14.0006653796, -19.0815680912), (-14.0341795694, -19.5836329763), (-14.1179860689, -20.0797870051))
            Line((-14.1179860689, -20.0797870051), (-2.3072965505, -20.2724877289))
        make_face()
        with BuildLine():
            Line((-18.0159229011, -18.0159229011), (-14.0853588324, -18.080053157))
            ThreePointArc((-14.0853588324, -18.080053157), (-15.4644660941, -15.4644660941), (-18.080053157, -14.0853588324))
            Line((-18.080053157, -14.0853588324), (-18.0159229011, -18.0159229011))
        make_face()
        with Locations((-17.0554563517, -17.0554563517)):
            Circle(F0_R, mode=Mode.SUBTRACT)
        with BuildLine():
            ThreePointArc((-14, -19), (-14.0213854418, -18.5380507809), (-14.0853588324, -18.080053157))
            Line((-14.0853588324, -18.080053157), (-18.0159229011, -18.0159229011))
            Line((-18.0159229011, -18.0159229011), (-18.080053157, -14.0853588324))
            ThreePointArc((-18.080053157, -14.0853588324), (-18.5786771094, -14.017782921), (-19.0815680912, -14.0006653796))
            Line((-19.0815680912, -14.0006653796), (-19, -19))
            Line((-19, -19), (-14.0006653796, -19.0815680912))
            ThreePointArc((-14.0006653796, -19.0815680912), (-14.0001663477, -19.0407854025), (-14, -19))
        make_face()
        with BuildLine():
            ThreePointArc((-19.2692159544, -2.4996673102), (-19.7807823778, -2.455272684), (-20.2724877289, -2.3072965505))
            Line((-20.2724877289, -2.3072965505), (-20.0797870051, -14.1179860689))
            ThreePointArc((-20.0797870051, -14.1179860689), (-19.5836329763, -14.0341795694), (-19.0815680912, -14.0006653796))
            Line((-19.0815680912, -14.0006653796), (-19.2692159544, -2.4996673102))
        make_face()
        with BuildLine():
            Line((0, -20.3101330936), (0.0163136221, -20.309866924))
            ThreePointArc((0.0163136221, -20.309866924), (-8.5e-09, -20.31), (-0.0163136391, -20.3098669237))
            Line((-0.0163136391, -20.3098669237), (0, -20.3101330936))
        make_face()
        with BuildLine():
            ThreePointArc((-14.1179860689, -20.0797870051), (-14.0341795694, -19.5836329763), (-14.0006653796, -19.0815680912))
            Line((-14.0006653796, -19.0815680912), (-19, -19))
            Line((-19, -19), (-19.0815680912, -14.0006653796))
            ThreePointArc((-19.0815680912, -14.0006653796), (-19.5836329763, -14.0341795694), (-20.0797870051, -14.1179860689))
            Line((-20.0797870051, -14.1179860689), (-19.9840770989, -19.9840770989))
            Line((-19.9840770989, -19.9840770989), (-14.1179860689, -20.0797870051))
        make_face()
        with BuildLine():
            Line((-19.9840770989, -19.9840770989), (-20.0797870051, -14.1179860689))
            ThreePointArc((-20.0797870051, -14.1179860689), (-22.5355339059, -22.5355339059), (-14.1179860689, -20.0797870051))
            Line((-14.1179860689, -20.0797870051), (-19.9840770989, -19.9840770989))
        make_face()
        with Locations((-18.288247626, -21.6562960223)):
            Circle(F0_R, mode=Mode.SUBTRACT)
        with Locations((-21.6562960223, -18.288247626)):
            Circle(F0_R, mode=Mode.SUBTRACT)
    extrude(amount=F1_DEPTH)


solid = f1.part
